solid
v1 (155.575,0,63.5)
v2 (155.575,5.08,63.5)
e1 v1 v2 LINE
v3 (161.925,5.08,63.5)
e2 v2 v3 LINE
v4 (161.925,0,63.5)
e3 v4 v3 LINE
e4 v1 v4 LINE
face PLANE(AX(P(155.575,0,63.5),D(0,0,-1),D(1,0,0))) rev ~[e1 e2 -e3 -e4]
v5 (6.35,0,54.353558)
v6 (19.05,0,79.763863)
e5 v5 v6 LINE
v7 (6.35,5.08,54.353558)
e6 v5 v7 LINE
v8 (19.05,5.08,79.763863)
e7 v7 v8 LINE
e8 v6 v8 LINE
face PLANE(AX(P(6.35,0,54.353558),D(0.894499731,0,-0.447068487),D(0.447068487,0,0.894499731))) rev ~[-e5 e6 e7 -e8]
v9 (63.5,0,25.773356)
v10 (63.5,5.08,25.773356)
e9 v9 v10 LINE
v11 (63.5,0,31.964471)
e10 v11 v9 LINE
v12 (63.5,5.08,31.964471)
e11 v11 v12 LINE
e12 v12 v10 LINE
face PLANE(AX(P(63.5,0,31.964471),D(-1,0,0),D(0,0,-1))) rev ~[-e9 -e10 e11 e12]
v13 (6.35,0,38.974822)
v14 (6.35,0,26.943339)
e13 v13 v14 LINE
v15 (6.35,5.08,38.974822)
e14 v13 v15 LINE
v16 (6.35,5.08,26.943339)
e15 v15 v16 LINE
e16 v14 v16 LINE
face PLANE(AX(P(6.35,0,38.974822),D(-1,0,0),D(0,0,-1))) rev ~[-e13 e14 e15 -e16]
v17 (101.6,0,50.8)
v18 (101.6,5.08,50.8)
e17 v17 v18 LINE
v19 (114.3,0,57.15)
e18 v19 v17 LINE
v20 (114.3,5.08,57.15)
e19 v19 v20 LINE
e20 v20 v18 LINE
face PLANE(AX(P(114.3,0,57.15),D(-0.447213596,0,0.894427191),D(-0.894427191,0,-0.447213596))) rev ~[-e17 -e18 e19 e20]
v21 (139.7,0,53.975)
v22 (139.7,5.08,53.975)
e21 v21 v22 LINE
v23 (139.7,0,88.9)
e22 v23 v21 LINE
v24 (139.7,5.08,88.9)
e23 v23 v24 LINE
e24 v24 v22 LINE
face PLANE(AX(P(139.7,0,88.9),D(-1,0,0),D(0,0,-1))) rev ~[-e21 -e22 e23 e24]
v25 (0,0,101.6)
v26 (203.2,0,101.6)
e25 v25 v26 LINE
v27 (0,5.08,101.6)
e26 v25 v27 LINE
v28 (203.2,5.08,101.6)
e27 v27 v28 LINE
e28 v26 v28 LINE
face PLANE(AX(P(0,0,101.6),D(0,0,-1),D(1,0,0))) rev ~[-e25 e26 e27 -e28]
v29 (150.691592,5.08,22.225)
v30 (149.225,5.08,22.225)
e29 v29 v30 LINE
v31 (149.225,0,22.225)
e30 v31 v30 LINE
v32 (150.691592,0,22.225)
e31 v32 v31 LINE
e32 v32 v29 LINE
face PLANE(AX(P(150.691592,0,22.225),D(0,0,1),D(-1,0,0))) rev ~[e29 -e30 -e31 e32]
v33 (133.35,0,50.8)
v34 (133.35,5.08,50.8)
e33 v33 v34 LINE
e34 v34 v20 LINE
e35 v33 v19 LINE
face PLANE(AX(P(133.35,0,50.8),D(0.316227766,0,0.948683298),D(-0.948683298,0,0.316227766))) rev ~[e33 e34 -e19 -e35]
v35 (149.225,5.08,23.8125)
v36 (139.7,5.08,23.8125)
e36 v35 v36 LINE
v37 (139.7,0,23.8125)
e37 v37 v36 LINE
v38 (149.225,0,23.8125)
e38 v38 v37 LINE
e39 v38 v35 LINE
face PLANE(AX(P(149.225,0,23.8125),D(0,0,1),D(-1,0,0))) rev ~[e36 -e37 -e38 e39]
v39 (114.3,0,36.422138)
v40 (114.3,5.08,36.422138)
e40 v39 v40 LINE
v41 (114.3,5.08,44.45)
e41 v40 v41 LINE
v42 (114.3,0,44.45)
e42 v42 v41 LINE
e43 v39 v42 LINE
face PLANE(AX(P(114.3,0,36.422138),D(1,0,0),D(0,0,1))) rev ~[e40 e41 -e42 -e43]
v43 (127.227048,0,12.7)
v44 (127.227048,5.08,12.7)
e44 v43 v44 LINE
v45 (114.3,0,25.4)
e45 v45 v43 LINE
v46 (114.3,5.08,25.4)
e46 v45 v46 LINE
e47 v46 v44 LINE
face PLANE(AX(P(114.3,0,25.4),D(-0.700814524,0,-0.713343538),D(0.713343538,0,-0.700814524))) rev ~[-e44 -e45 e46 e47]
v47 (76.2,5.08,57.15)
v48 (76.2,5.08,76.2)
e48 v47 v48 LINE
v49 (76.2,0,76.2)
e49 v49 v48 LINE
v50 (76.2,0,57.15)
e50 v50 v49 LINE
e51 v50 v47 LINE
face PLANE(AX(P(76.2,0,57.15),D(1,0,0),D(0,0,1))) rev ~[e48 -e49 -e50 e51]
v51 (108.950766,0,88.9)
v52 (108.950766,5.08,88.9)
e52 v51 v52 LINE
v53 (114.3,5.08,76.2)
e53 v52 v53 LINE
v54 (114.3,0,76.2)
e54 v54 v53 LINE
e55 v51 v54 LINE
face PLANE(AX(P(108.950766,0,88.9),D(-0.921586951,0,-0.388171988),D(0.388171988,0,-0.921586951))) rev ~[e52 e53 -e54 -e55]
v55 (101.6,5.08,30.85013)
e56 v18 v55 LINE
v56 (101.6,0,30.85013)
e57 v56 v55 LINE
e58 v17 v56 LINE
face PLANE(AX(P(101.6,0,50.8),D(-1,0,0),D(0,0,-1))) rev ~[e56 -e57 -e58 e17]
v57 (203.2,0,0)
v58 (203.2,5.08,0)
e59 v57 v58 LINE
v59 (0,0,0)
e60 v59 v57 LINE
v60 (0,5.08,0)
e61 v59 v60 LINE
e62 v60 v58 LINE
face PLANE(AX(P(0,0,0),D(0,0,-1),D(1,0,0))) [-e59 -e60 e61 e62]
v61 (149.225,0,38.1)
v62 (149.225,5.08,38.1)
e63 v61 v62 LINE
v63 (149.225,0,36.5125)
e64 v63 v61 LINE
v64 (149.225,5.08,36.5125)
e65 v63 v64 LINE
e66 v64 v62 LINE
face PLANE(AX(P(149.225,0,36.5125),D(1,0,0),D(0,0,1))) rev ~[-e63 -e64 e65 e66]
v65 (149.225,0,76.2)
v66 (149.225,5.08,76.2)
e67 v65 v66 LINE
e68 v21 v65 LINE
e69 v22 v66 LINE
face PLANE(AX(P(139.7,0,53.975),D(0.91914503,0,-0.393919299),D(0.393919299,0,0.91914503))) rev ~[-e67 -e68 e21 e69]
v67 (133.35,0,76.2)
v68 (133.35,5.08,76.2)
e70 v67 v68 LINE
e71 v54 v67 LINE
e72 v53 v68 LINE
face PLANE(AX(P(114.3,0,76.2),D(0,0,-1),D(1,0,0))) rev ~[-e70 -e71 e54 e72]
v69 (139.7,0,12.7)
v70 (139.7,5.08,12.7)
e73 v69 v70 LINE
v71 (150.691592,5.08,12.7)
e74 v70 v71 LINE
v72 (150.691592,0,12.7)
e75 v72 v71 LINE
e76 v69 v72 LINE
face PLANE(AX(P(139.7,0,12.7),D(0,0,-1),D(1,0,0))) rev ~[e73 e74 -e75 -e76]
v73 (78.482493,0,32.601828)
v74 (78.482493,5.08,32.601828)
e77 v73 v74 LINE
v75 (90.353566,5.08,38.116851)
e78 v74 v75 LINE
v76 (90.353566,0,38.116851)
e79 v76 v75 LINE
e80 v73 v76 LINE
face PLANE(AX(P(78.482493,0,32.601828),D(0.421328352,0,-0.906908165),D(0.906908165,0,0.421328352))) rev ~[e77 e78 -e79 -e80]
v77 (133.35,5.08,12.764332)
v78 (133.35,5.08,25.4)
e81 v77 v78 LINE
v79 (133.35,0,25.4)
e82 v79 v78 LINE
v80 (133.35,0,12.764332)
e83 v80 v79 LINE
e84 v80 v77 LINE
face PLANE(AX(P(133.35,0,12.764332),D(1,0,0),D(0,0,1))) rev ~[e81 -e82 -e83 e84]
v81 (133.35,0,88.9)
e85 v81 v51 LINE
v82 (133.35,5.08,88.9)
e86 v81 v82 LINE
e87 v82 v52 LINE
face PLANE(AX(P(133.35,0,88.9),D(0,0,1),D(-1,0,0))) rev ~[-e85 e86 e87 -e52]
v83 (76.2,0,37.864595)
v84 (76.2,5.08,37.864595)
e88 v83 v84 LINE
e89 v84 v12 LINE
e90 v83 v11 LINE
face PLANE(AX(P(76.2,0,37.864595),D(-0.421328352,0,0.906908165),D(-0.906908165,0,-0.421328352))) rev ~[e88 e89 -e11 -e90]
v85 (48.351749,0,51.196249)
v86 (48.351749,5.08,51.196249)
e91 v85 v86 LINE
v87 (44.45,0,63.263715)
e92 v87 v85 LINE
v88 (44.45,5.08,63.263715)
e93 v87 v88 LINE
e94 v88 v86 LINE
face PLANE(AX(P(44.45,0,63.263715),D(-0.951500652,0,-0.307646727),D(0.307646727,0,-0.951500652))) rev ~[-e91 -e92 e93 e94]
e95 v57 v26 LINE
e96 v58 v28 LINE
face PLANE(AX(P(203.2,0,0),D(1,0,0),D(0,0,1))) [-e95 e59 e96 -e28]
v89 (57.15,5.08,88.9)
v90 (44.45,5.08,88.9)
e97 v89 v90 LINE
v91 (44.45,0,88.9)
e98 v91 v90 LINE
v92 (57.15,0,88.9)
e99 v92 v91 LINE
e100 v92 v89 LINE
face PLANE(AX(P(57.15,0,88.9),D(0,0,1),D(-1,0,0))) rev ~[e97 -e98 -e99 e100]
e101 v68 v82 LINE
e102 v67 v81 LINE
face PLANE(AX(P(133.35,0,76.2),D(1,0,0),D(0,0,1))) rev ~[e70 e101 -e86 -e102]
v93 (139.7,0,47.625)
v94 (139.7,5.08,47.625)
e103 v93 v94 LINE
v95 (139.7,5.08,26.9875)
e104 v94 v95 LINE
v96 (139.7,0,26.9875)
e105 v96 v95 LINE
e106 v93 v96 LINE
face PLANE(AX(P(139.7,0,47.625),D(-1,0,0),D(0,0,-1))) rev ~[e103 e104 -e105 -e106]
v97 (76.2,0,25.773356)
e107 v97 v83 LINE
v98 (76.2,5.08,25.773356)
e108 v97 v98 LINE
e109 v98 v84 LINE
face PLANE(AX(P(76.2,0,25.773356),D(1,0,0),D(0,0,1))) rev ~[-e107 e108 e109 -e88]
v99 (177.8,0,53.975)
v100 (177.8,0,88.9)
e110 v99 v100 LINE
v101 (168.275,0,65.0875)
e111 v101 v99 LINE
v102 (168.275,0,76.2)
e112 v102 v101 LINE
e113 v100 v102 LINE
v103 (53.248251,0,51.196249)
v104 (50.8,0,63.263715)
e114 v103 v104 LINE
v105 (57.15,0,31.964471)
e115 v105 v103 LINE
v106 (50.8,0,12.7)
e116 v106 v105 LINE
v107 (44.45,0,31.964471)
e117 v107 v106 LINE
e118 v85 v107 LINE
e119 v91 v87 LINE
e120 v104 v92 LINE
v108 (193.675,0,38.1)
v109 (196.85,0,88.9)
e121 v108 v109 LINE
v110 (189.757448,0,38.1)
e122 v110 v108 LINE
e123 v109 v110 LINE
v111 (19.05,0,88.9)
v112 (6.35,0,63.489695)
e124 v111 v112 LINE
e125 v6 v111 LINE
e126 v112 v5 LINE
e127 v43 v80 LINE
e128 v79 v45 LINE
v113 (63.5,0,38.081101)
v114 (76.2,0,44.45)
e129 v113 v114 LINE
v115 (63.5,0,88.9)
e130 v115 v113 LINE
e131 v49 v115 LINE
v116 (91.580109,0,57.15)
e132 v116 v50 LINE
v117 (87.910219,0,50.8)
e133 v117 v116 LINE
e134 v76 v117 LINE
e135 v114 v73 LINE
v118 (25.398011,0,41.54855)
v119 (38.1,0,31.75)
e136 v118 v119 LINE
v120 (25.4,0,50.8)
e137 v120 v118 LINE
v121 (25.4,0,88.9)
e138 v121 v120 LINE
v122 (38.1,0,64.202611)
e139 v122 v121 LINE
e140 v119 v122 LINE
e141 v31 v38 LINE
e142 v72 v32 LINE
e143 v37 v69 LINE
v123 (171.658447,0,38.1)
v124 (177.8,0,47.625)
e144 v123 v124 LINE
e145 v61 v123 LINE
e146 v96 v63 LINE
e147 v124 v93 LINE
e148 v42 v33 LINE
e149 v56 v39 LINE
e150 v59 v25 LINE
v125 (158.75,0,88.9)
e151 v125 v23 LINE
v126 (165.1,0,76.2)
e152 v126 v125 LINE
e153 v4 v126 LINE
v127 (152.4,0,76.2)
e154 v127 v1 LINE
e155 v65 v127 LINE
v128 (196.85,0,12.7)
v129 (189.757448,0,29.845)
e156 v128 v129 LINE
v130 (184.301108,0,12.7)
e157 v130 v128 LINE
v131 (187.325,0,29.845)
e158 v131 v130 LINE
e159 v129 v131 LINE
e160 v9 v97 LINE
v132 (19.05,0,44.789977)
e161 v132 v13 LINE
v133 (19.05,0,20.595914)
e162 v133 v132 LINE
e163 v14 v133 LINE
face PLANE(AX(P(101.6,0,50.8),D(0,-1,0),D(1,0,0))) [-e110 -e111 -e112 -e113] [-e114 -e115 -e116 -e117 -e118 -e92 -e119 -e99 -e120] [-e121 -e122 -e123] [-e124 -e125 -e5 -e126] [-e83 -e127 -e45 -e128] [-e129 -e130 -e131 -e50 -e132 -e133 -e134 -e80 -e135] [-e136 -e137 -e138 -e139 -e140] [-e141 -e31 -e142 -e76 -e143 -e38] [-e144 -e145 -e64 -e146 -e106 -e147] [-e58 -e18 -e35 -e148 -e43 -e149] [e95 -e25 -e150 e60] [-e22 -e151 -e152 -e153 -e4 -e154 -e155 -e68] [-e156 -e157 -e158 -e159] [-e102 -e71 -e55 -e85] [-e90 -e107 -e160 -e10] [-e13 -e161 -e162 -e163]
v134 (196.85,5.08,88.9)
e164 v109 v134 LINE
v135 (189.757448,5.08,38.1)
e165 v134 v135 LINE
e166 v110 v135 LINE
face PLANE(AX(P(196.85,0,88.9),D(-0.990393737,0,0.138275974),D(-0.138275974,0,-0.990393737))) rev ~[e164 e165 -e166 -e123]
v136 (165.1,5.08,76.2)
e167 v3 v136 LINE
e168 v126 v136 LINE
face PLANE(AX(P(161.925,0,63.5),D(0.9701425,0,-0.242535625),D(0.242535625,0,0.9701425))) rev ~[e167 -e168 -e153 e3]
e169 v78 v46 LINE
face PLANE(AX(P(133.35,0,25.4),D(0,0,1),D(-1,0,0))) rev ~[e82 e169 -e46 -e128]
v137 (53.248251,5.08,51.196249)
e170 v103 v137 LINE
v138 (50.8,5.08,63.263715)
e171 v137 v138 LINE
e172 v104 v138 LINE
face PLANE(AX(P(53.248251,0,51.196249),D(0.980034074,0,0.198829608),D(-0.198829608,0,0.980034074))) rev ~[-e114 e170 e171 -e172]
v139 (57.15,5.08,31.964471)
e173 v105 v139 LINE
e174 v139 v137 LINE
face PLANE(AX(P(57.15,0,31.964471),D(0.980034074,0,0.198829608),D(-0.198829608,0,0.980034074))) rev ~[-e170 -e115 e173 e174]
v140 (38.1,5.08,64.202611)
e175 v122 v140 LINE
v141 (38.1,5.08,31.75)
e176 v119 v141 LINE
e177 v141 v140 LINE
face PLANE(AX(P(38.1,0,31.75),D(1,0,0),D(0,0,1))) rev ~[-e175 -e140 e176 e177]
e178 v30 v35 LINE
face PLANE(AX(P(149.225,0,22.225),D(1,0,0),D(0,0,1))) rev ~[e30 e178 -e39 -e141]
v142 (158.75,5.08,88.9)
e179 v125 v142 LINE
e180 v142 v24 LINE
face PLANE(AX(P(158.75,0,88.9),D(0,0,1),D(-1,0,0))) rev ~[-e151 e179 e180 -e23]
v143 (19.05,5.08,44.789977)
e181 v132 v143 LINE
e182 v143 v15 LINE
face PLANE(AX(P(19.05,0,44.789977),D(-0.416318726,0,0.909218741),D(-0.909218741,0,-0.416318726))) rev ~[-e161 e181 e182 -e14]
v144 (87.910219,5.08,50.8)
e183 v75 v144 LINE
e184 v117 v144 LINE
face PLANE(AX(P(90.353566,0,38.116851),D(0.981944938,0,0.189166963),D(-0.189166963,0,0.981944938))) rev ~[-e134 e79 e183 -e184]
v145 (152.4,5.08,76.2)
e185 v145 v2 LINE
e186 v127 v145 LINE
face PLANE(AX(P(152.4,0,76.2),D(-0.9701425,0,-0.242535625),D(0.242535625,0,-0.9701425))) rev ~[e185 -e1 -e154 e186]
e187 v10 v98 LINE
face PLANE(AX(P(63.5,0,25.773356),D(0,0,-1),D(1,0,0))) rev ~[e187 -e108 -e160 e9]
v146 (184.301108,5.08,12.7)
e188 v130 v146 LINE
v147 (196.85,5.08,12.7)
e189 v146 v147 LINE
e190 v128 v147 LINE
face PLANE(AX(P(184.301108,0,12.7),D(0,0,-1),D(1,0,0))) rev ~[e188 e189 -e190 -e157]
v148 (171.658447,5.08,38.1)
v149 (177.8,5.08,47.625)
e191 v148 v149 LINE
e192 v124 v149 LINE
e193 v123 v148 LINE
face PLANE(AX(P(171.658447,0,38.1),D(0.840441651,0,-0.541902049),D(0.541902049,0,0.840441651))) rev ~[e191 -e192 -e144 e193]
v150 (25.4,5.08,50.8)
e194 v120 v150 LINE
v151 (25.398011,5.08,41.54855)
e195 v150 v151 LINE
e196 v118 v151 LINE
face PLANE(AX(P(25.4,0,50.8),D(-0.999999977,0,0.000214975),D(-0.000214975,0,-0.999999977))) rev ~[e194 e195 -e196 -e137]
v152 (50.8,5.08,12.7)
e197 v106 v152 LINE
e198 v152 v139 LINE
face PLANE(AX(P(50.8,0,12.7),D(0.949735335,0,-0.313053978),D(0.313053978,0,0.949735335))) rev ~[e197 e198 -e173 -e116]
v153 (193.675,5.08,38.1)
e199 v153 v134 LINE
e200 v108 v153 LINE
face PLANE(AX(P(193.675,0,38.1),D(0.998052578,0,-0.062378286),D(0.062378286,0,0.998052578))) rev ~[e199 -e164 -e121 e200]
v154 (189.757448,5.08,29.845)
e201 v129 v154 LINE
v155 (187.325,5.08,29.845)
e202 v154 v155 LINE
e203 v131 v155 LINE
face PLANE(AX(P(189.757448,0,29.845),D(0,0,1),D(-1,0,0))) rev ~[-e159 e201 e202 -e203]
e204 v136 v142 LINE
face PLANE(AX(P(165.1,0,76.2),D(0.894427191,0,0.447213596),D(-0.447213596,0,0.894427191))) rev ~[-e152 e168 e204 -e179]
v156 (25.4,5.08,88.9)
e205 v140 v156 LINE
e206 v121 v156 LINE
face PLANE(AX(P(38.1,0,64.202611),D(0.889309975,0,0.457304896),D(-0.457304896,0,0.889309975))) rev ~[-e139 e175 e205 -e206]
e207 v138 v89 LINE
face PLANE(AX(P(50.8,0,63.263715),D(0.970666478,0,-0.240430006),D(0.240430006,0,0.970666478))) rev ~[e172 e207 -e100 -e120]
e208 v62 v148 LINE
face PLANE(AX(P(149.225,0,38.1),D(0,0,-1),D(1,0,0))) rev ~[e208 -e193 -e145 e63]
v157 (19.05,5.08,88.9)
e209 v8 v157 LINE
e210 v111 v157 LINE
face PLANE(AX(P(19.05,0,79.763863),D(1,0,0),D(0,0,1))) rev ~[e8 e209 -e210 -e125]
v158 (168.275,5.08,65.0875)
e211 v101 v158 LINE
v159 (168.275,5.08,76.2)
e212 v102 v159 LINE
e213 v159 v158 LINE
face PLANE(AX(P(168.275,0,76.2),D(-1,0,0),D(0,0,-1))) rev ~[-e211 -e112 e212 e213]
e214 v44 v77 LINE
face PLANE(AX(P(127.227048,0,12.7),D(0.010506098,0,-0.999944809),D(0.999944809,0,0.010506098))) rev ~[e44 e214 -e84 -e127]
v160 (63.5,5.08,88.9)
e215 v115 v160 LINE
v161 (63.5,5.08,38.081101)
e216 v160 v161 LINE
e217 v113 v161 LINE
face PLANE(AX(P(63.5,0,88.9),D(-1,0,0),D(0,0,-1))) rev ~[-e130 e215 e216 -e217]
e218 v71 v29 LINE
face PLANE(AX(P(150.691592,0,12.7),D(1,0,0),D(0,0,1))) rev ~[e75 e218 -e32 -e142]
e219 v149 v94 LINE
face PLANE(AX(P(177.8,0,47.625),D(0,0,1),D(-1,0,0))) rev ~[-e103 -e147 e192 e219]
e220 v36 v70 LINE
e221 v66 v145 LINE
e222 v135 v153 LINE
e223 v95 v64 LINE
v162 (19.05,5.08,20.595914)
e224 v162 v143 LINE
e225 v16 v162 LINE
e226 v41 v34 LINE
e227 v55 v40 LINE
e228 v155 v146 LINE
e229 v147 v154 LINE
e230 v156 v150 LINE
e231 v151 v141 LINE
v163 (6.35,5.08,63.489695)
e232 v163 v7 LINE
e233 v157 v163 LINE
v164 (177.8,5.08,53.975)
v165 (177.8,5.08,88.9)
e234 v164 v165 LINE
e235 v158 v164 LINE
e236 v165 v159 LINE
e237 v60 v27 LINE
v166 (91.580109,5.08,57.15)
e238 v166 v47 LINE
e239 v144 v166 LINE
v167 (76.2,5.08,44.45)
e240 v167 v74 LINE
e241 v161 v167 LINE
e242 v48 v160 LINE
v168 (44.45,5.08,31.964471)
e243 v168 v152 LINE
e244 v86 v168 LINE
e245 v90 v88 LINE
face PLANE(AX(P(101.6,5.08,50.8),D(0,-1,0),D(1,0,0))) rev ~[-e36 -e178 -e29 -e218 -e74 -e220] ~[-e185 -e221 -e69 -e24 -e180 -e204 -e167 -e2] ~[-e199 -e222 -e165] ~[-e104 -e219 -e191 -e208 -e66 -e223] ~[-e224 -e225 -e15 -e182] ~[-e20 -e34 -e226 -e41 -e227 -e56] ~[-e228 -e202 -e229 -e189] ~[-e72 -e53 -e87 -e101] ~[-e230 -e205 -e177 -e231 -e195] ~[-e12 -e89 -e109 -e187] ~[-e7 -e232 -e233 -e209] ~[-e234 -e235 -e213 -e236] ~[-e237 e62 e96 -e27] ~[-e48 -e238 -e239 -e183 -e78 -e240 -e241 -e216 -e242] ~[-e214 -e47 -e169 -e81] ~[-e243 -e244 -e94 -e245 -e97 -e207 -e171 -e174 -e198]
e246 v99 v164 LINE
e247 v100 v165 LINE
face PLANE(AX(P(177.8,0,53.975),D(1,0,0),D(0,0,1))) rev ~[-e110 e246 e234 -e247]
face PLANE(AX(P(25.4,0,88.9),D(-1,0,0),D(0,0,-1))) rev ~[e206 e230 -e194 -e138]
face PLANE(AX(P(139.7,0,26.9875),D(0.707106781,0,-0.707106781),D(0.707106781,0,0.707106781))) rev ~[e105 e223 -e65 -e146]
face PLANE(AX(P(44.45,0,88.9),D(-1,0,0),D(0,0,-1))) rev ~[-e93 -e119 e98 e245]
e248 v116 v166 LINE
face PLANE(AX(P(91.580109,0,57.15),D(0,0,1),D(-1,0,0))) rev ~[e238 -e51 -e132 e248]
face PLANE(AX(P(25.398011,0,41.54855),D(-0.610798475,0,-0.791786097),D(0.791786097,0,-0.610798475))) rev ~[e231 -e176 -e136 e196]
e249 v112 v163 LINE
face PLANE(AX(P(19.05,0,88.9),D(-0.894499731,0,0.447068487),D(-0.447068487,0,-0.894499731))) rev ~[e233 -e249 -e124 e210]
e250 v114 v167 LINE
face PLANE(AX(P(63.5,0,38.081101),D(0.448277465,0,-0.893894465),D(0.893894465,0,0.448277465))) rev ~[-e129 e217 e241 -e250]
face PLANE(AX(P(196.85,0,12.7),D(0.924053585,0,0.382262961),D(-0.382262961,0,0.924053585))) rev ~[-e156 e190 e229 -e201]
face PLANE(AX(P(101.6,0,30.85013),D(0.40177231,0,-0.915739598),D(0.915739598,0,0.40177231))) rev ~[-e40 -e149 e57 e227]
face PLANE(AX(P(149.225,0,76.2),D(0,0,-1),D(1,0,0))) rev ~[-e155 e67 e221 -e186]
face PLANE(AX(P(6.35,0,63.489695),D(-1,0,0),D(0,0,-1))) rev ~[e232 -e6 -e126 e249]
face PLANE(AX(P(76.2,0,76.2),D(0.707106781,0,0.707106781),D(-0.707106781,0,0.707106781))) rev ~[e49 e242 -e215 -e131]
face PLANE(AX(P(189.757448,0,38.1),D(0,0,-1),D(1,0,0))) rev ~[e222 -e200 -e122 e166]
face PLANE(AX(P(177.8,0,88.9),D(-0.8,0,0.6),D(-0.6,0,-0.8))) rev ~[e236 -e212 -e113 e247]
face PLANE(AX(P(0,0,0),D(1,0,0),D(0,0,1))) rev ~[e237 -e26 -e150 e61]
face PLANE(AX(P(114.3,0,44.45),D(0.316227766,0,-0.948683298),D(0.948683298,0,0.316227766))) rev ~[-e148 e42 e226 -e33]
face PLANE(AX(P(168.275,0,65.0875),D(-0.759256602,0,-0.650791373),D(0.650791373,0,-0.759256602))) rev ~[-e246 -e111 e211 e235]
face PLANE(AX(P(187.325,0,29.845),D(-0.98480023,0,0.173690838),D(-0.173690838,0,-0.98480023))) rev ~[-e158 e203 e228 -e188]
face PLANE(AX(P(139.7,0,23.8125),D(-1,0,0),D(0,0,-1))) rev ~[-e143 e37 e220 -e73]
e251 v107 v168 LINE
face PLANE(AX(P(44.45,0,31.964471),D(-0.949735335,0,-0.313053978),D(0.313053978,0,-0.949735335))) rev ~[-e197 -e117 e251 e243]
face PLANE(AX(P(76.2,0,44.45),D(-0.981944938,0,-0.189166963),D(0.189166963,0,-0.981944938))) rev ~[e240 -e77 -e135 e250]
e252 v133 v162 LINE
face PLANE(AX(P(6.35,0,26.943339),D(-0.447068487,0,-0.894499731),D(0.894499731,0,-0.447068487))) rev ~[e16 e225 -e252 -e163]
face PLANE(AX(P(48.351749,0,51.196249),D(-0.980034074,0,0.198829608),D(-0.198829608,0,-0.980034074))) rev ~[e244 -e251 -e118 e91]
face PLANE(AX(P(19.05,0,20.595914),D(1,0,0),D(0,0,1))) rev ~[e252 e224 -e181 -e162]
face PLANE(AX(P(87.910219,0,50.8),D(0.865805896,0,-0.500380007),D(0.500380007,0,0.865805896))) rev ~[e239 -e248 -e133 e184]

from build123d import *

# Parameters (mm, degrees)
F1_W     = 203.2
F1_H     = 101.6
F2_DEPTH = 5.08
F5_DEPTH = 25.4


with BuildPart() as f2:
    # F1 (on Front) → F2 (new body)
    with BuildSketch(Plane.XZ):
        with Locations((101.6, 50.8)):
            Rectangle(F1_W, F1_H)
    extrude(amount=-F2_DEPTH)

    # F4 (on face) → F5 (cut)
    with BuildSketch(Plane.XZ):
        Polygon((19.05, 88.9), (6.35, 63.4896950778), (6.35, 54.3535576701), (19.05, 79.7638625923), align=None)
        Polygon((19.05, 44.7899766155), (6.35, 38.9748217106), (6.35, 26.9433392146), (19.05, 20.5959144004), (19.05, 31.75), align=None)
        Polygon((25.4, 64.1602875233), (25.4, 50.8), (25.3980111729, 41.5485496718), (38.1, 31.75), (38.1, 50.8), (38.1, 64.1602875233), align=None)
        Polygon((25.4, 88.9), (25.4, 64.1602875233), (38.1, 64.1602875233), (38.1, 64.2026114812), align=None)
        Polygon((57.15, 88.9), (44.45, 88.9), (44.45, 63.2637151304), (48.3517487947, 51.1962487751), (44.45, 31.964471331), (50.8, 12.7), (57.15, 31.964471331), (53.2482512053, 51.1962487751), (50.8, 63.2637151304), align=None)
        Polygon((76.2, 76.2), (63.5, 88.9), (63.5, 38.0811007293), (76.2, 44.45), (78.4824932634, 32.6018280187), (90.3535660462, 38.1168511729), (87.9102185152, 50.8), (91.5801092576, 57.15), (76.2, 57.15), align=None)
        Polygon((76.2, 37.8645947099), (63.5, 31.964471331), (63.5, 25.7733563287), (76.2, 25.7733563287), align=None)
        Polygon((133.35, 50.8), (114.3, 57.15), (101.6, 50.8), (114.3, 44.45), align=None)
        Polygon((114.3, 44.45), (101.6, 50.8), (101.6, 30.8501303583), (114.3, 36.4221383274), align=None)
        Polygon((108.9507660084, 88.9), (114.3, 76.2), (133.35, 76.2), (133.35, 88.9), align=None)
        Polygon((133.35, 25.4), (114.3, 25.4), (127.2270479083, 12.7), (133.35, 12.7643318847), align=None)
        Polygon((149.225, 76.2), (152.4, 76.2), (158.75, 88.9), (139.7, 88.9), (139.7, 53.975), align=None)
        Polygon((158.75, 88.9), (152.4, 76.2), (155.575, 63.5), (161.925, 63.5), (165.1, 76.2), align=None)
        Polygon((177.8, 53.975), (177.8, 88.9), (168.275, 76.2), (168.275, 65.0875), align=None)
        Polygon((177.8, 47.625), (139.7, 47.625), (139.7, 26.9875), (149.225, 36.5125), (149.225, 38.1), (171.658446914, 38.1), align=None)
        Polygon((149.225, 23.8125), (139.7, 23.8125), (139.7, 12.7), (150.6915916045, 12.7), (150.6915916045, 22.225), (149.225, 22.225), align=None)
        Polygon((196.85, 88.9), (189.7574476064, 38.1), (193.675, 38.1), align=None)
        Polygon((196.85, 12.7), (189.7574476064, 29.845), (187.325, 29.845), (184.3011081219, 12.7), align=None)
    extrude(amount=-F5_DEPTH, mode=Mode.SUBTRACT)


solid = f2.part
